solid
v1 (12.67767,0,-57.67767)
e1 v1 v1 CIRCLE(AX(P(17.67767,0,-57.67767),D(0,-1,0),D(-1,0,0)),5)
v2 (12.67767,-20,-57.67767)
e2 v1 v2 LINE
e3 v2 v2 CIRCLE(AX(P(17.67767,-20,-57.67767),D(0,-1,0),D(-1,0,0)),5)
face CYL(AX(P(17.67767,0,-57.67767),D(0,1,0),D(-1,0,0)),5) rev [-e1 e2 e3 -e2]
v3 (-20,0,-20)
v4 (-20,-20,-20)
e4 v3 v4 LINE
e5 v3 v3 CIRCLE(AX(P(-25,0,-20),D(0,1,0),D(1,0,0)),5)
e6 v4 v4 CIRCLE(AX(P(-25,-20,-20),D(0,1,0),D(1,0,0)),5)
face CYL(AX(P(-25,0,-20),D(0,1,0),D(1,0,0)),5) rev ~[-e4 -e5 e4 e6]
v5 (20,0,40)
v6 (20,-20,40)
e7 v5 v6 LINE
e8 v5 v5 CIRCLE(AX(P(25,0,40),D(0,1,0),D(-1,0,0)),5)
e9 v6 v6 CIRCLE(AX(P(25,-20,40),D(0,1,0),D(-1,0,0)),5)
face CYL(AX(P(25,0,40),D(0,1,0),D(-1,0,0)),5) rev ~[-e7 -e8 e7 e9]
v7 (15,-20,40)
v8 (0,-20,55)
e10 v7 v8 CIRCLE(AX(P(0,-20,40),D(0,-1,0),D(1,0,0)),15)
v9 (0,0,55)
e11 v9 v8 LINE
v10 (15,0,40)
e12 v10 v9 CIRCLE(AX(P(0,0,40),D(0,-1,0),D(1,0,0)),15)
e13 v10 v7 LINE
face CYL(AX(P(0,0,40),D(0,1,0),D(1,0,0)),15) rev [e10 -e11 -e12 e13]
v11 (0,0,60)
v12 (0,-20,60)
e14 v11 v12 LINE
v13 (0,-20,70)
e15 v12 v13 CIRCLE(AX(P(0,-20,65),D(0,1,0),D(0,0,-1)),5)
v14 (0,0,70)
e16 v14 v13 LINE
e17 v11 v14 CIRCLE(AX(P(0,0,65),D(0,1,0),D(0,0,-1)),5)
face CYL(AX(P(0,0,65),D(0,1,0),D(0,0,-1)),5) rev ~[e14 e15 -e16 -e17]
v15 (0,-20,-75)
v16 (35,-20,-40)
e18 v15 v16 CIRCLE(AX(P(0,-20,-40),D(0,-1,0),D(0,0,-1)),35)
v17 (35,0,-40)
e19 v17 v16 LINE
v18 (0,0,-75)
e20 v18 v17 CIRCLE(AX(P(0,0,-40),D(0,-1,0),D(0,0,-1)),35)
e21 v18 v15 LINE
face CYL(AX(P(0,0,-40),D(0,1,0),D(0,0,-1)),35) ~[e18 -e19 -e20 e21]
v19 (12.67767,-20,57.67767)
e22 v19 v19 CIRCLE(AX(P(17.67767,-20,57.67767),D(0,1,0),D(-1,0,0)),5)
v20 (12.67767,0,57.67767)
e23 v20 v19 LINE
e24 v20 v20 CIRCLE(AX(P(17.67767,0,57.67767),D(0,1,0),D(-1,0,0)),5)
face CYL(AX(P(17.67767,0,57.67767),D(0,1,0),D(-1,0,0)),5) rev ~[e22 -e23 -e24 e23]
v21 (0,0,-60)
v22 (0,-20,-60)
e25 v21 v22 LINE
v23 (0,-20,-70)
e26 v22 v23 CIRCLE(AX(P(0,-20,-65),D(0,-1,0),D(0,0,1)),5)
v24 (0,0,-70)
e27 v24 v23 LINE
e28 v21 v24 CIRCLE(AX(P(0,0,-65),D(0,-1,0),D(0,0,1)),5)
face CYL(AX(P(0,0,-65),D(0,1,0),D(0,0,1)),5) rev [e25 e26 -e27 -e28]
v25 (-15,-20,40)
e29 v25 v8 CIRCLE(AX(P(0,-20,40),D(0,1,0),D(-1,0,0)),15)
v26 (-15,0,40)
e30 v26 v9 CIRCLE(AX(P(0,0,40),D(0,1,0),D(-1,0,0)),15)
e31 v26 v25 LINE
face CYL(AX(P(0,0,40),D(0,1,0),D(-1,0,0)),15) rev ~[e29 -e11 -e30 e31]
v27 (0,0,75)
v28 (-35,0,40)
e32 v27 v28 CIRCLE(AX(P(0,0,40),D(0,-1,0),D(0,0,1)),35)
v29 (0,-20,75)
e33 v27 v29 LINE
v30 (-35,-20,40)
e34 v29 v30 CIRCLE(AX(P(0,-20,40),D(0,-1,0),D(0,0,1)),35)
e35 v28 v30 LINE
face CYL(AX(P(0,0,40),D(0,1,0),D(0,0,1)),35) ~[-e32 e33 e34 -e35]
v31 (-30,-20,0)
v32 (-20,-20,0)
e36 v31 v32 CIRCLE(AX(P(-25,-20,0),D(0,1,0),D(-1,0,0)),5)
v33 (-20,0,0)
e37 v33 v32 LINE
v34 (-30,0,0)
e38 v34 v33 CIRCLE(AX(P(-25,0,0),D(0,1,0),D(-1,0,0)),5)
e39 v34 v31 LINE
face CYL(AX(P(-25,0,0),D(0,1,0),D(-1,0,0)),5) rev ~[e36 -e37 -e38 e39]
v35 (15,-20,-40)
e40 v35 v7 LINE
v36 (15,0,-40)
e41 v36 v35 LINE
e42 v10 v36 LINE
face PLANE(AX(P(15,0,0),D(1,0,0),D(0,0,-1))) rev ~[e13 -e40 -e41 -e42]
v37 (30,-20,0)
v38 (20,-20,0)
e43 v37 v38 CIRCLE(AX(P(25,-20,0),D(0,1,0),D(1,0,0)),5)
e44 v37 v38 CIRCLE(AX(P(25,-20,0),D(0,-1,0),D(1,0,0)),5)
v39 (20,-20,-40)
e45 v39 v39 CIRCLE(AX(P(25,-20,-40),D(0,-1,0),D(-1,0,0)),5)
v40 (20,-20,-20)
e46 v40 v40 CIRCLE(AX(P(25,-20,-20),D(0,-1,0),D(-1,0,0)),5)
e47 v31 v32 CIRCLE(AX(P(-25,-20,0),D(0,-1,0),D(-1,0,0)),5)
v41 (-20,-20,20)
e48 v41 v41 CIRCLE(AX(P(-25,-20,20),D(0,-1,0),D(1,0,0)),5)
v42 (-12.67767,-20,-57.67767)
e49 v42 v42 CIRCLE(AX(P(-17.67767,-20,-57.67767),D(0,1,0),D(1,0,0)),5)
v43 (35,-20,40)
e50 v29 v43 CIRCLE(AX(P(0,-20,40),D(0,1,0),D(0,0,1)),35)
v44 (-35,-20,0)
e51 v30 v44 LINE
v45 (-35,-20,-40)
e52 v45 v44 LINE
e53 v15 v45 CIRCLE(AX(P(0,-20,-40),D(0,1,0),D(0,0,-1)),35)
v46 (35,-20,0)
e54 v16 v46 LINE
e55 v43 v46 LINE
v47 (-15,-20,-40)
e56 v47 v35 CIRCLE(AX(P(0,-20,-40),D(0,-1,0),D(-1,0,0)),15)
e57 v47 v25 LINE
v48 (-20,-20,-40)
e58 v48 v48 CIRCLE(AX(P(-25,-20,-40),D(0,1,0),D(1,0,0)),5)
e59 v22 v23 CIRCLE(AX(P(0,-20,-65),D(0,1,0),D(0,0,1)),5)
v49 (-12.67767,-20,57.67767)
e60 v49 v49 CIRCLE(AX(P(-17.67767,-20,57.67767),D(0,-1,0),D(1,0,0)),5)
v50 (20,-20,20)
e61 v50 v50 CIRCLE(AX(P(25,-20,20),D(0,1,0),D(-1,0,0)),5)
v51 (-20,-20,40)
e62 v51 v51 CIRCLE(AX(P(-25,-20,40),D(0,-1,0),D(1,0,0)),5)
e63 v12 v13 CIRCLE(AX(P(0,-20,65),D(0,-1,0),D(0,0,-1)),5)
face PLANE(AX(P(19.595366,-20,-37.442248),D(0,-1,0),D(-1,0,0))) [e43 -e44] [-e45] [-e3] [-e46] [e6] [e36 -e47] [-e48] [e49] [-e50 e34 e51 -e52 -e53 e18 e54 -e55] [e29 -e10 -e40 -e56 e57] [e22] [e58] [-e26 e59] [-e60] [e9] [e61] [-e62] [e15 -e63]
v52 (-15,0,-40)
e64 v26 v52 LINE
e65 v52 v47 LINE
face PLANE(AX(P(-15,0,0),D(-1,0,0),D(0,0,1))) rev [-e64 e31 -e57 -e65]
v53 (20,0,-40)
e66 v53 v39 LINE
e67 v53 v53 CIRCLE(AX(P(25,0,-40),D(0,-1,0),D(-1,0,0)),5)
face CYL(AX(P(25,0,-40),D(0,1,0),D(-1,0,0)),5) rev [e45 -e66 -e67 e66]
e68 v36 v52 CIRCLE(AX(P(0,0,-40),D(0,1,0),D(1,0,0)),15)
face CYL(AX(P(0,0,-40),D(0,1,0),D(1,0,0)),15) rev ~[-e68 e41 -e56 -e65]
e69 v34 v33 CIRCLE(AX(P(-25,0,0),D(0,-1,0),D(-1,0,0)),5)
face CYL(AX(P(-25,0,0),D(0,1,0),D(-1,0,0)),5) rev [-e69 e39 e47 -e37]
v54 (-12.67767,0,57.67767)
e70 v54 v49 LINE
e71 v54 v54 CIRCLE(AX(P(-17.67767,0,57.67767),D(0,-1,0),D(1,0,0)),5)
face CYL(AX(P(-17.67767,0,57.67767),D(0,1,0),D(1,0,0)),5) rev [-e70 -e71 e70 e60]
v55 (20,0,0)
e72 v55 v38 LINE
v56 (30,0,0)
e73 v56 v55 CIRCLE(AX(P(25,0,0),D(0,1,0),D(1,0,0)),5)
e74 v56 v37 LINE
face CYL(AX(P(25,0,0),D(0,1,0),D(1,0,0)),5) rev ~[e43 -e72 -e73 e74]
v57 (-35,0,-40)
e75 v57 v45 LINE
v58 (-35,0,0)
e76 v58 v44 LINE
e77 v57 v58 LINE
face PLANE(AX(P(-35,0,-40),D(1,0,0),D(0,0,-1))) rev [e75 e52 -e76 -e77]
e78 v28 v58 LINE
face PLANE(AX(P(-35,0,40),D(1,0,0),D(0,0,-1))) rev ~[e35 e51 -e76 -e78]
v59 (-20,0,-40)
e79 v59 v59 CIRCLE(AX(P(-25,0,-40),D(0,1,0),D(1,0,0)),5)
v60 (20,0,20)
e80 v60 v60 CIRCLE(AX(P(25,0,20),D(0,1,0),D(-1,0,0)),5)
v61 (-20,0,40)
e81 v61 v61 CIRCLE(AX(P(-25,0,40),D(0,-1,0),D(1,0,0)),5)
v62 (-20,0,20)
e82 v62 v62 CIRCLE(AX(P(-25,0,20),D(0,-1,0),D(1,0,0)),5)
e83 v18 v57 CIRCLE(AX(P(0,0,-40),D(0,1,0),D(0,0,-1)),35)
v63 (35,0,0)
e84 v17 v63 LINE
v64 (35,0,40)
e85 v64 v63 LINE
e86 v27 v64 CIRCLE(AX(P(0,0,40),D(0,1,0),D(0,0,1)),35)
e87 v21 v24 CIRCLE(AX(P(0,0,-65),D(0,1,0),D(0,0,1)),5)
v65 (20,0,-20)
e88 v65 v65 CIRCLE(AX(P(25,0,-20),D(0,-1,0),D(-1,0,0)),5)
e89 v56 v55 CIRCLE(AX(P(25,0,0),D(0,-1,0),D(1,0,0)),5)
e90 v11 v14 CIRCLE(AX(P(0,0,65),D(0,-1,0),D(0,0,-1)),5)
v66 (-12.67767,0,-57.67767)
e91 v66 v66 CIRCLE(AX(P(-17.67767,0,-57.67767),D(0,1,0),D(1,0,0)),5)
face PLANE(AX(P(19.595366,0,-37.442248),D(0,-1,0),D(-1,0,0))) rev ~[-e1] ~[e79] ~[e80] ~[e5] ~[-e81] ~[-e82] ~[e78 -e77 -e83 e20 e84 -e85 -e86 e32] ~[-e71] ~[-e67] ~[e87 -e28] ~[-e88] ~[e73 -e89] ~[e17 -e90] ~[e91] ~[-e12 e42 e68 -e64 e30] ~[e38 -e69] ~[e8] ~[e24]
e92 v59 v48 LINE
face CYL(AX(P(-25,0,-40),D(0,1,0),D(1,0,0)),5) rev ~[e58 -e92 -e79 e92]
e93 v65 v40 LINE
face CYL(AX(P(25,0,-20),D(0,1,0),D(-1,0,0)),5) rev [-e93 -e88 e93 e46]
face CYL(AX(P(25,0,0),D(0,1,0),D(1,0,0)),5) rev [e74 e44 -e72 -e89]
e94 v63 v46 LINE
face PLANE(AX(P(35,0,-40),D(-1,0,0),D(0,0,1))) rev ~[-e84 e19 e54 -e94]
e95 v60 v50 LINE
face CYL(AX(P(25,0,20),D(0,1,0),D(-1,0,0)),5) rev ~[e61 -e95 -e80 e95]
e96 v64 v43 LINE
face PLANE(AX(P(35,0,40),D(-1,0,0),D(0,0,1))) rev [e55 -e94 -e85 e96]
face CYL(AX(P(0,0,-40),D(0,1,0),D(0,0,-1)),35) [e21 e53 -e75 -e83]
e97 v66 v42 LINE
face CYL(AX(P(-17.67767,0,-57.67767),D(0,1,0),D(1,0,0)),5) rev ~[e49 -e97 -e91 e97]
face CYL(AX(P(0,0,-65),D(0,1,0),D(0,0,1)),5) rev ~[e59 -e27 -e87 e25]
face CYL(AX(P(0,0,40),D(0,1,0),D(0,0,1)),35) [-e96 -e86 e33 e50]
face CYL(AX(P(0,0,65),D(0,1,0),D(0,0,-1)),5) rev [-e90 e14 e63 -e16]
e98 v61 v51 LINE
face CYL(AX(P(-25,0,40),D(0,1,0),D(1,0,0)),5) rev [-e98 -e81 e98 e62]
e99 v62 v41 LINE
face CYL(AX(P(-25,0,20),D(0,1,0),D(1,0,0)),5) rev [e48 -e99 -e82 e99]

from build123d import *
from build123d import SkipClean  # not in build123d's __all__

# Parameters (mm, degrees)
F0_R     = 5
F1_DEPTH = 20


with BuildPart() as f1:
    # F0 (on Front) → F1 (new body)
    with BuildSketch(Plane.XZ):
        with BuildLine():
            ThreePointArc((-15, 40), (-10.6066017178, 50.6066017178), (0, 55))
            Line((0, 55), (0, 60))
            ThreePointArc((0, 60), (-5, 65), (0, 70))
            Line((0, 70), (0, 75))
            ThreePointArc((0, 75), (-24.7487373415, 64.7487373415), (-35, 40))
            Line((-35, 40), (-35, 0))
            Line((-35, 0), (-30, 0))
            ThreePointArc((-30, 0), (-25, 5), (-20, 0))
            Line((-20, 0), (-15, 0))
            Line((-15, 0), (-15, 40))
        make_face()
        with Locations((-25, 20)):
            Circle(F0_R, mode=Mode.SUBTRACT)
        with Locations((-25, 40)):
            Circle(F0_R, mode=Mode.SUBTRACT)
        with Locations((-17.6776695297, 57.6776695297)):
            Circle(F0_R, mode=Mode.SUBTRACT)
    extrude(amount=F1_DEPTH)

    # F2: F1 across plane


with BuildPart() as f1_1:
    add(f1.part, clean=False)
    with SkipClean():  # cleaning this boolean's faces spoils the solid; the shape is the same uncleaned
        add(f1.part.mirror(Plane.YZ), clean=False)

    # F3: F1 across plane


with BuildPart() as f1_2:
    add(f1_1.part, clean=False)
    add(f1_1.part.mirror(Plane.XY), clean=False)


solid = f1_2.part
